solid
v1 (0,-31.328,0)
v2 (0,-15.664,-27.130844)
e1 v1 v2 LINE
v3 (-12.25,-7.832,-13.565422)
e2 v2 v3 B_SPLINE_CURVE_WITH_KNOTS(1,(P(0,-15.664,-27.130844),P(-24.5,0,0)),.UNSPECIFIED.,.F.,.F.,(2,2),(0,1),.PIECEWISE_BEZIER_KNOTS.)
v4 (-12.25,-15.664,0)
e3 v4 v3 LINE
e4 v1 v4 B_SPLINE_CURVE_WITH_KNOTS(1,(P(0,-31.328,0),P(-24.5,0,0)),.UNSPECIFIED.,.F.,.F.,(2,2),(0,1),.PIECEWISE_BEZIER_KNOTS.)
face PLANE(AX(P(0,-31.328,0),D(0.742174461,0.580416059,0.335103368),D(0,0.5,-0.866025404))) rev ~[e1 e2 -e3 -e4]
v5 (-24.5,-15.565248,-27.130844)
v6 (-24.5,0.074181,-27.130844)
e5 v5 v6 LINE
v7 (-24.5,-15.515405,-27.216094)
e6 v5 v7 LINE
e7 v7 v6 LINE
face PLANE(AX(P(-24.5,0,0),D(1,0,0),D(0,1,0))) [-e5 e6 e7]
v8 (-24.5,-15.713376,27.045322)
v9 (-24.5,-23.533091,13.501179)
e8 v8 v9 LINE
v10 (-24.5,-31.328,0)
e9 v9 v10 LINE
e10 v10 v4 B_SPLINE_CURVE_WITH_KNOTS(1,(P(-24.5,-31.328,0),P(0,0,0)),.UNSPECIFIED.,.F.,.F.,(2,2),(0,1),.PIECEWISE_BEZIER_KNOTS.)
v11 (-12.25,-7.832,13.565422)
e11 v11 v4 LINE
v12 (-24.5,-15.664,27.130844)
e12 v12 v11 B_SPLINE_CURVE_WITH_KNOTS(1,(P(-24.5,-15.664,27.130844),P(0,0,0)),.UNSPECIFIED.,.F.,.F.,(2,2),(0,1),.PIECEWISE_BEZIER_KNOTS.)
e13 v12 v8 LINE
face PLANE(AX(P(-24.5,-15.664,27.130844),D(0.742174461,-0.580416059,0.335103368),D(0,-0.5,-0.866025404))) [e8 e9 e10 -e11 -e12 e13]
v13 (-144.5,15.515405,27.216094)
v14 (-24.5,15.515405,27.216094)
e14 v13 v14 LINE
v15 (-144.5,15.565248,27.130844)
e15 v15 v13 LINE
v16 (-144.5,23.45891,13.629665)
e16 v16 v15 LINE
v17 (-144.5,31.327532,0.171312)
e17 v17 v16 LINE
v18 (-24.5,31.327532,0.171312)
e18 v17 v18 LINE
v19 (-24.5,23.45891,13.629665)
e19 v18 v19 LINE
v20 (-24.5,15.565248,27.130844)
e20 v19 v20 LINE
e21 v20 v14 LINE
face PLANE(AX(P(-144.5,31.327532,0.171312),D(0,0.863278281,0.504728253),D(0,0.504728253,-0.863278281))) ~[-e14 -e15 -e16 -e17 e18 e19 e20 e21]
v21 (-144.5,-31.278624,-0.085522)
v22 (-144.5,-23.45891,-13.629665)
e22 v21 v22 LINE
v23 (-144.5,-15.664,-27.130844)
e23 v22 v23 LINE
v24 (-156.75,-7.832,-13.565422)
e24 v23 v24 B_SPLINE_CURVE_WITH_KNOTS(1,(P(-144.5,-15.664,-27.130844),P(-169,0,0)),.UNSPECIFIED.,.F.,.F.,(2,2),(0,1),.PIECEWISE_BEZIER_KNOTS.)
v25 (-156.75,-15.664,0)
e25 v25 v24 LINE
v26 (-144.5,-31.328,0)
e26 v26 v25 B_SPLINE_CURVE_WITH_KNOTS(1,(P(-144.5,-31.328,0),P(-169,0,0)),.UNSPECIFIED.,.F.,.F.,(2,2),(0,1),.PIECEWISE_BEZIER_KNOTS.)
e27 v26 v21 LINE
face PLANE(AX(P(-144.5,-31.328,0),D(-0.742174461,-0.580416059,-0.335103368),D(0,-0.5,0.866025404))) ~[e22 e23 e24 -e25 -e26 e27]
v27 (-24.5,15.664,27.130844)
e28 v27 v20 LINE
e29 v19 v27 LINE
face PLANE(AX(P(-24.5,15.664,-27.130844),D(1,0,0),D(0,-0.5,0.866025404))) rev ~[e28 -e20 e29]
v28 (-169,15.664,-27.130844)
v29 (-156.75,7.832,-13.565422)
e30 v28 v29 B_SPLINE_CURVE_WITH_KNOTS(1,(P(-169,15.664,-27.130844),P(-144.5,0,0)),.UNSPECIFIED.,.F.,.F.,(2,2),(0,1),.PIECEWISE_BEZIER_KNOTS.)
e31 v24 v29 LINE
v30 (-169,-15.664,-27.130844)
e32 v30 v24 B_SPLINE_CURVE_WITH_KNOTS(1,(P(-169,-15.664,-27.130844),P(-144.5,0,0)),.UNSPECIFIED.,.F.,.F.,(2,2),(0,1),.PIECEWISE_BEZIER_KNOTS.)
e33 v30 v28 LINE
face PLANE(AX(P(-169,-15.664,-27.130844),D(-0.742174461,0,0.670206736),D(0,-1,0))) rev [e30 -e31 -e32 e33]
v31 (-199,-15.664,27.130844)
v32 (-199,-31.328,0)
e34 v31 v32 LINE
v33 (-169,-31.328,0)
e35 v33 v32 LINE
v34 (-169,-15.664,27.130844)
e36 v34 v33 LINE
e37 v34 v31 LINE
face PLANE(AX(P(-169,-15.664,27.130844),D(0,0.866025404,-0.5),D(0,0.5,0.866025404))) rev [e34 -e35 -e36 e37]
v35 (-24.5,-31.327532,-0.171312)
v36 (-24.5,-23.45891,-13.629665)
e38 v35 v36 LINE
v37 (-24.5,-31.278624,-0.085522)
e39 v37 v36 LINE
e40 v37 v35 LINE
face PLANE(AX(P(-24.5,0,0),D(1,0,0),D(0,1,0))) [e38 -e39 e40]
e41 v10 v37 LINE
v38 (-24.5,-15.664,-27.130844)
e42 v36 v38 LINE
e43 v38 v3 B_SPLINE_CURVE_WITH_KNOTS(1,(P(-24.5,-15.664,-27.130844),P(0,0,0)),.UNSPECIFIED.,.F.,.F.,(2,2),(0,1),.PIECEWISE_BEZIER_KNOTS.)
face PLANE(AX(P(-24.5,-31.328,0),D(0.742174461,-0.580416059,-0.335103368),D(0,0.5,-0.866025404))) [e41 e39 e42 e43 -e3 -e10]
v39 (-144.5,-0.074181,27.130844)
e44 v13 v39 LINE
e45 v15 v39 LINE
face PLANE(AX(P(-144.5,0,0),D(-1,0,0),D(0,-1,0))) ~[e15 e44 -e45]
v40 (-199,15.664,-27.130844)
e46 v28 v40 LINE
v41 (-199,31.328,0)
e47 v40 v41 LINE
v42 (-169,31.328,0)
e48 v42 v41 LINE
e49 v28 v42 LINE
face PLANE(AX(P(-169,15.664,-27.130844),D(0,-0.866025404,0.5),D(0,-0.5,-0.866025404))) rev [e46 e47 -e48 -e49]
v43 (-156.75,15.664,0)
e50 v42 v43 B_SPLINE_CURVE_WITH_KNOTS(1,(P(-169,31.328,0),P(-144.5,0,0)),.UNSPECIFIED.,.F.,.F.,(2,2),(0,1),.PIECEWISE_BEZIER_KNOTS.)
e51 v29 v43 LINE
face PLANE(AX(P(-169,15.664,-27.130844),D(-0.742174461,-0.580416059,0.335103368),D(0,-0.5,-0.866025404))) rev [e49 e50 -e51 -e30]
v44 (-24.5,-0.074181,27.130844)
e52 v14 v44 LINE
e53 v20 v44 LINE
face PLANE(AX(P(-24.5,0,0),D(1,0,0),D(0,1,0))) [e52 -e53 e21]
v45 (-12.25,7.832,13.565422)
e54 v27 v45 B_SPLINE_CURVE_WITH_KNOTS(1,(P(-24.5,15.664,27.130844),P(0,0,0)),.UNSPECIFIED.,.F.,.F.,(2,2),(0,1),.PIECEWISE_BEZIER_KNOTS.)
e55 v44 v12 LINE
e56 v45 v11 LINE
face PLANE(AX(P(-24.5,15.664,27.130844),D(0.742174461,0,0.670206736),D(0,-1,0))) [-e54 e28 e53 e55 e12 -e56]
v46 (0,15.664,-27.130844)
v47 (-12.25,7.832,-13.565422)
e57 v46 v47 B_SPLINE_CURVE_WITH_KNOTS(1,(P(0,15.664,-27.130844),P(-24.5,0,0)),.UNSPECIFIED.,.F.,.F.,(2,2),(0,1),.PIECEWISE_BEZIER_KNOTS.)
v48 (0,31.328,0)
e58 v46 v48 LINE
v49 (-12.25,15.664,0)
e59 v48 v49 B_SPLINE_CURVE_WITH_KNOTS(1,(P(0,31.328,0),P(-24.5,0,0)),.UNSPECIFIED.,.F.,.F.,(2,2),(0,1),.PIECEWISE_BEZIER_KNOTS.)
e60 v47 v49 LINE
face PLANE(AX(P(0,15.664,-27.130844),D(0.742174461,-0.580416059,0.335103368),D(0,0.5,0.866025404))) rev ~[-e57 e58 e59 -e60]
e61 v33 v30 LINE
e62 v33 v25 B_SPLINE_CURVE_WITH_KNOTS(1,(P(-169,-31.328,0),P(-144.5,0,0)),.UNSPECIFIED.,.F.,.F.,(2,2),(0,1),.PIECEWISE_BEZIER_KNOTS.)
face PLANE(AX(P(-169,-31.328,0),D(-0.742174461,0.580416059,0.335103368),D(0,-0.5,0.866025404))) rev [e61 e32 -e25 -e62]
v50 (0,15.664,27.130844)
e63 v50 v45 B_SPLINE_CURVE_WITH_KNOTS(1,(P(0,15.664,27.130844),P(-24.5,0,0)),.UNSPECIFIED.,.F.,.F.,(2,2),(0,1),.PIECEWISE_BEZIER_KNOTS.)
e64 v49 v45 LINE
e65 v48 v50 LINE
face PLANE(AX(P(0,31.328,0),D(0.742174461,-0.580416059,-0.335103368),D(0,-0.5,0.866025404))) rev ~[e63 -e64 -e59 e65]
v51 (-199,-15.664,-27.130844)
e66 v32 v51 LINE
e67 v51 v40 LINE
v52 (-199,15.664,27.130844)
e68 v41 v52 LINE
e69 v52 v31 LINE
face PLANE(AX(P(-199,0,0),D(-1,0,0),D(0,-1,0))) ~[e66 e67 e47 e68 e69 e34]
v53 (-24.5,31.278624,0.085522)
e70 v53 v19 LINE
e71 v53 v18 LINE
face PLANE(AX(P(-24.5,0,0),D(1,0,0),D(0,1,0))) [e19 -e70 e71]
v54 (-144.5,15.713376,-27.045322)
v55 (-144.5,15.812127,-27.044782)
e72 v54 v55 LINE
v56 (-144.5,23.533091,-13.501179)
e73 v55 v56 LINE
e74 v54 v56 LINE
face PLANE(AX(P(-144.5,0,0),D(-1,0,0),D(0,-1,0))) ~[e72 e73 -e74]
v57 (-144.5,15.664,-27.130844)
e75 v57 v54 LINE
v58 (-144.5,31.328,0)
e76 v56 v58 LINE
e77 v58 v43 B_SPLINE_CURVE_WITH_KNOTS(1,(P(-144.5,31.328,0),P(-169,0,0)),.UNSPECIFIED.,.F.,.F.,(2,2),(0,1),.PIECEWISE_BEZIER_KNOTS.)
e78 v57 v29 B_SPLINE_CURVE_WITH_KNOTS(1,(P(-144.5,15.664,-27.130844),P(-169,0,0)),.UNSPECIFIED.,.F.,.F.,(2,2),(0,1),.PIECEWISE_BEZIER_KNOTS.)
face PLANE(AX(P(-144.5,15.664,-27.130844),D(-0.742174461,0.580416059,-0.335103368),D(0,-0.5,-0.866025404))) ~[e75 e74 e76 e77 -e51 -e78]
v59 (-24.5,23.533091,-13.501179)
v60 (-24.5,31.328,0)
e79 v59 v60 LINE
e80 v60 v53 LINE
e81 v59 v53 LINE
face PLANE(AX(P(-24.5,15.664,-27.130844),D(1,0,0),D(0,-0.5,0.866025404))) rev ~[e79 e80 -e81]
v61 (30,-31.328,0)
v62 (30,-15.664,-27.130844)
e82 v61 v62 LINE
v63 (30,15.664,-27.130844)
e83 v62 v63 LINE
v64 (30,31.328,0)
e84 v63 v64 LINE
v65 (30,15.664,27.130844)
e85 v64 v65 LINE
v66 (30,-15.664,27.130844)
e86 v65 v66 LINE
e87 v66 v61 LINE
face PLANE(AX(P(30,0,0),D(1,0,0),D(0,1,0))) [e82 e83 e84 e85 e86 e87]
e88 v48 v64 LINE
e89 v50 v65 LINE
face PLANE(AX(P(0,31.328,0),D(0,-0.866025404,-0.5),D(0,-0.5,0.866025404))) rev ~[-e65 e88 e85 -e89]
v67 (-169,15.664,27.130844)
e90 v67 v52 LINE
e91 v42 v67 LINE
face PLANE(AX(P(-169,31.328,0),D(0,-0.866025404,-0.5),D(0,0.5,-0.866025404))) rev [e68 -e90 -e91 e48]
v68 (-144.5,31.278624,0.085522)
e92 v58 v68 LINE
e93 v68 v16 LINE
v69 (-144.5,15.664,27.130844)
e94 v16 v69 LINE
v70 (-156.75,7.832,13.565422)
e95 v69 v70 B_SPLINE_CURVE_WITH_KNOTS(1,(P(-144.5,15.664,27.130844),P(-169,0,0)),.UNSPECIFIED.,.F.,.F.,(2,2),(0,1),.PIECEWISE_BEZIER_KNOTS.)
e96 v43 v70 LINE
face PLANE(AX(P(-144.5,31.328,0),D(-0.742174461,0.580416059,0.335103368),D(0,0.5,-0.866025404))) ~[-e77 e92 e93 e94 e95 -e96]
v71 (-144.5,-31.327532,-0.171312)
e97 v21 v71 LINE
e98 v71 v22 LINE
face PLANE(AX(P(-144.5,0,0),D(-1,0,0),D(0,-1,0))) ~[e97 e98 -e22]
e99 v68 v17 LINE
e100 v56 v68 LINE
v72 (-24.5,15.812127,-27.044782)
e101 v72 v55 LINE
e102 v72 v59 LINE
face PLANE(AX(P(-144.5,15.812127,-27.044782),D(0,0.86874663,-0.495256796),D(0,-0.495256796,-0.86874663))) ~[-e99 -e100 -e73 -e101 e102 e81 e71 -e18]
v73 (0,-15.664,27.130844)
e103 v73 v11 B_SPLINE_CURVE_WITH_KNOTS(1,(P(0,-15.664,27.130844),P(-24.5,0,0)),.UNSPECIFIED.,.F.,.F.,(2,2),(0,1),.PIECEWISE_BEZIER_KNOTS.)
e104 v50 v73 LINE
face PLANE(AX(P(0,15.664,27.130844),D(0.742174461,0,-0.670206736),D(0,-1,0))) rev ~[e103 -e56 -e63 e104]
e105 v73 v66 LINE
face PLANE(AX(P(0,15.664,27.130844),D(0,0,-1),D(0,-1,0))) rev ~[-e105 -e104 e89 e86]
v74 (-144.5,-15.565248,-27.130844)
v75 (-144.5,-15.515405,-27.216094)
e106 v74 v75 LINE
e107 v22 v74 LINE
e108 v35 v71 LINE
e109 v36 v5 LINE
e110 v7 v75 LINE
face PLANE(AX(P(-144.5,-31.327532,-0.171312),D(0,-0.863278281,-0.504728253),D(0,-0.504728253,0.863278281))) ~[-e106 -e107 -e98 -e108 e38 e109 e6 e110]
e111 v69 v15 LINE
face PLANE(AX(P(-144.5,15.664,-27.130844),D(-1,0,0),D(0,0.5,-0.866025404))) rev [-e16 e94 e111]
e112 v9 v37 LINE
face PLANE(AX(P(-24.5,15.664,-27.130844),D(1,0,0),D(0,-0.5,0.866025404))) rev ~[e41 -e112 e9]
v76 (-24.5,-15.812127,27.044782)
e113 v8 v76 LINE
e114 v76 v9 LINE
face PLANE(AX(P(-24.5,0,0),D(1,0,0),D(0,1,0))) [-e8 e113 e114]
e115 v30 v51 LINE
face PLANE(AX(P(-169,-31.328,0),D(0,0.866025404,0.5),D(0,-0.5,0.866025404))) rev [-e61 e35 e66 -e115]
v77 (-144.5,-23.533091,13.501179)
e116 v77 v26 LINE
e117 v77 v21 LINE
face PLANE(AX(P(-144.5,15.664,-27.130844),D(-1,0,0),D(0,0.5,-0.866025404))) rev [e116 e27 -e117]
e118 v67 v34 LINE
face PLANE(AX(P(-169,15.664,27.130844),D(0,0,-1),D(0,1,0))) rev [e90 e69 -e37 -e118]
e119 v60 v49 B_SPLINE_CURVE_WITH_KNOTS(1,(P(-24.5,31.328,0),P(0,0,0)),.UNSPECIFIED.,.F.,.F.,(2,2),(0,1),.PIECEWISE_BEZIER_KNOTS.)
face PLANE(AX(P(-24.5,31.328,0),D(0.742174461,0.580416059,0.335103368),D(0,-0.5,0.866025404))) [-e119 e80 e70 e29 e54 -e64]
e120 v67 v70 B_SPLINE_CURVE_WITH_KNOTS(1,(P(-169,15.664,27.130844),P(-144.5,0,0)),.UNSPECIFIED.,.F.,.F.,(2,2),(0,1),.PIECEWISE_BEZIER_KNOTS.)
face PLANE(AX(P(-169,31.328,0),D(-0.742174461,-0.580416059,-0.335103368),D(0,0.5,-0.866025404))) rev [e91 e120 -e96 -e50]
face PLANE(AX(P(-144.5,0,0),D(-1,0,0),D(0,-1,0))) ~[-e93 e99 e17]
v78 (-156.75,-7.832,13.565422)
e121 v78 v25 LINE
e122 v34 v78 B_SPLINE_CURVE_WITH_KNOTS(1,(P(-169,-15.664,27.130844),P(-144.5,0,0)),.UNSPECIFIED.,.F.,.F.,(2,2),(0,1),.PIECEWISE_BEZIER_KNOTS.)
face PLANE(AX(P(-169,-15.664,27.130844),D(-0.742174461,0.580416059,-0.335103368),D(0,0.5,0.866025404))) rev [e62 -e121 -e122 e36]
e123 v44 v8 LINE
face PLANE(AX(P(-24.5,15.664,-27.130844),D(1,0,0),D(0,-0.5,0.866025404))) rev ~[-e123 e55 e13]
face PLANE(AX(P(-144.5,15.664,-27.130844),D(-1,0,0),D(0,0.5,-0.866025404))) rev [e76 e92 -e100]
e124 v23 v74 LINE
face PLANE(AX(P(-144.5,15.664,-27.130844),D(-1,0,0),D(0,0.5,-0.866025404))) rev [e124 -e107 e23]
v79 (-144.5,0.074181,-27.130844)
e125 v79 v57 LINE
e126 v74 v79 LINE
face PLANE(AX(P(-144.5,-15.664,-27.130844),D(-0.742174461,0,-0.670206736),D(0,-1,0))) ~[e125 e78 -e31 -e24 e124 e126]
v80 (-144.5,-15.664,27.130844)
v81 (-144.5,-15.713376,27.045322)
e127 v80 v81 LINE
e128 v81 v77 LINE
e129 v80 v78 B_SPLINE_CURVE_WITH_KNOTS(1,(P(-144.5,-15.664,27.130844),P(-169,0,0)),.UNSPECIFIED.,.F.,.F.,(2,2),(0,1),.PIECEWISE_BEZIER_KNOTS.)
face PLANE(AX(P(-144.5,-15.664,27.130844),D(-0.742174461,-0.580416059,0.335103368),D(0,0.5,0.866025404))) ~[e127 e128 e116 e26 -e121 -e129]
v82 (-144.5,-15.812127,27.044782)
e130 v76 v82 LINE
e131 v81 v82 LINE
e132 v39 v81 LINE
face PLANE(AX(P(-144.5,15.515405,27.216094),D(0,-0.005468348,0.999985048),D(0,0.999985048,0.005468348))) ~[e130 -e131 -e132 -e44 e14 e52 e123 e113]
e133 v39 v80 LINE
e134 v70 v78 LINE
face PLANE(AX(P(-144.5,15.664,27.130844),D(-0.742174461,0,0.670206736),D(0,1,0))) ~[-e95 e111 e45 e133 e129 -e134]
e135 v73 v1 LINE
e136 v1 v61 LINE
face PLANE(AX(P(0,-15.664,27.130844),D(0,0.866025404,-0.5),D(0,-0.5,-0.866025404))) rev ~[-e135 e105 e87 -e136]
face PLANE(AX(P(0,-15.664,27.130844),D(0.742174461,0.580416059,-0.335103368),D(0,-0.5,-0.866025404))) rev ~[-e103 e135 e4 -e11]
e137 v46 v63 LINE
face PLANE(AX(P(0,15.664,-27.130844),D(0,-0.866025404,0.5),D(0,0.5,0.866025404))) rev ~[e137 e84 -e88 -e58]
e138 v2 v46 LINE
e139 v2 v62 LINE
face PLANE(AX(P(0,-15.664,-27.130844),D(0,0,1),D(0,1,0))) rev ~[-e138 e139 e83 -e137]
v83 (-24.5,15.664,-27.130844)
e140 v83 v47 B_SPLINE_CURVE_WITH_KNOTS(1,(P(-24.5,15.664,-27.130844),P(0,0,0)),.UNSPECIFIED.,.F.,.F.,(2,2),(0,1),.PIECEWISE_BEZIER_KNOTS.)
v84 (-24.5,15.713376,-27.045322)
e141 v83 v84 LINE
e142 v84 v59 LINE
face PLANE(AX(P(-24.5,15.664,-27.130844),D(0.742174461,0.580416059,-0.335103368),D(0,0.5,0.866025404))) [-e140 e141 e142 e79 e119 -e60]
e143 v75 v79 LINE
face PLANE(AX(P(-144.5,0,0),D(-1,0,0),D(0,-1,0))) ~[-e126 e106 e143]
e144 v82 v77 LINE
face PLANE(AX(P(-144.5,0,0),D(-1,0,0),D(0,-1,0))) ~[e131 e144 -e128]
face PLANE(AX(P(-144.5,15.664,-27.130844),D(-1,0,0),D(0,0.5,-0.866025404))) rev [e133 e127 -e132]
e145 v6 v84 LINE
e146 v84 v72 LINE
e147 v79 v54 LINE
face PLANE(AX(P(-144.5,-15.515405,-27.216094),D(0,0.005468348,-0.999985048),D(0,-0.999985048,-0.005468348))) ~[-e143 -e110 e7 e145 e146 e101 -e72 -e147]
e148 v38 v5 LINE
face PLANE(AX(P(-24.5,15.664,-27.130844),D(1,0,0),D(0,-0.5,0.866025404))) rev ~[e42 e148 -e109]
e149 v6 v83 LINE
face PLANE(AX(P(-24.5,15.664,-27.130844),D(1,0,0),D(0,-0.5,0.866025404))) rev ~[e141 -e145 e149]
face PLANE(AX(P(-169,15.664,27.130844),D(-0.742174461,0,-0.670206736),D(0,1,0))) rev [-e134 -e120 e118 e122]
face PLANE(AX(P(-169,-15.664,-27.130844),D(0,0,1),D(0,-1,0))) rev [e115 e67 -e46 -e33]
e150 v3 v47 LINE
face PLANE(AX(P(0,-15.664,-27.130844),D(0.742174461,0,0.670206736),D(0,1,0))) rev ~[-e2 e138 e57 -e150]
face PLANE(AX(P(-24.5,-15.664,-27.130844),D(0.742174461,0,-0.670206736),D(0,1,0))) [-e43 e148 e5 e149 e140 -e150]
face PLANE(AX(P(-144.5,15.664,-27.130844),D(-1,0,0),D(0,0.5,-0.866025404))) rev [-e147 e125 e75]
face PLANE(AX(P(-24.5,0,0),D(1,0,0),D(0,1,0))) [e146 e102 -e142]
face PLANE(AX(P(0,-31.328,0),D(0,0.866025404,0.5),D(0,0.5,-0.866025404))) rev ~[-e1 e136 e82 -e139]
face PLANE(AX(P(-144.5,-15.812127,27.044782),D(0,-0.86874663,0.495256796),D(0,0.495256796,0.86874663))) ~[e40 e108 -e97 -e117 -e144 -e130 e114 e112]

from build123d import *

# Parameters (mm, degrees)
F1_DEPTH = 30
F4_DEPTH = 60


with BuildPart() as f1:
    # F0 (on Right) → F1 (new body)
    with BuildSketch(Plane.YZ):
        Polygon((15.664, -27.1308438498), (31.328, 0), (15.664, 27.1308438498), (-15.664, 27.1308438498), (-31.328, 0), (-15.664, -27.1308438498), align=None)
    extrude(amount=F1_DEPTH)



with BuildPart() as f4:
    # F3 (on offset) → F4 (new body)
    with BuildSketch(Plane.YZ.offset(-24.5)):
        Polygon((15.8121267025, -27.0447819948), (31.3275315985, 0.1713124148), (15.515404896, 27.2160944096), (-15.8121267025, 27.0447819948), (-31.3275315985, -0.1713124148), (-15.515404896, -27.2160944096), align=None)
    extrude(amount=-F4_DEPTH)


with BuildPart() as f1_1:
    add(f1.part)

    add(f4.part)  # F8 merges F4
    # F6 (on Right) → F8 section 0
    with BuildSketch(Plane.YZ, mode=Mode.PRIVATE) as f8_s0:
        Polygon((15.664, -27.1308438498), (31.328, 0), (15.664, 27.1308438498), (-15.664, 27.1308438498), (-31.328, 0), (-15.664, -27.1308438498), align=None)
    loft([f8_s0.sketch, Vertex(-24.5, 0, 0)])

    # F7 (on offset) → F9 section 0
    with BuildSketch(Plane.YZ.offset(-24.5), mode=Mode.PRIVATE) as f9_s0:
        Polygon((15.664, -27.1308438498), (31.328, 0), (15.664, 27.1308438498), (-15.664, 27.1308438498), (-31.328, 0), (-15.664, -27.1308438498), align=None)
    loft([f9_s0.sketch, Vertex(0, 0, 0)])

    # F10: F1 across plane


with BuildPart() as f1_2:
    add(f1_1.part)
    add(f1_1.part.mirror(Plane(origin=(-84.5, 0, 0), x_dir=(0, 1, 0), z_dir=(-1, 0, 0))))


solid = f1_2.part
